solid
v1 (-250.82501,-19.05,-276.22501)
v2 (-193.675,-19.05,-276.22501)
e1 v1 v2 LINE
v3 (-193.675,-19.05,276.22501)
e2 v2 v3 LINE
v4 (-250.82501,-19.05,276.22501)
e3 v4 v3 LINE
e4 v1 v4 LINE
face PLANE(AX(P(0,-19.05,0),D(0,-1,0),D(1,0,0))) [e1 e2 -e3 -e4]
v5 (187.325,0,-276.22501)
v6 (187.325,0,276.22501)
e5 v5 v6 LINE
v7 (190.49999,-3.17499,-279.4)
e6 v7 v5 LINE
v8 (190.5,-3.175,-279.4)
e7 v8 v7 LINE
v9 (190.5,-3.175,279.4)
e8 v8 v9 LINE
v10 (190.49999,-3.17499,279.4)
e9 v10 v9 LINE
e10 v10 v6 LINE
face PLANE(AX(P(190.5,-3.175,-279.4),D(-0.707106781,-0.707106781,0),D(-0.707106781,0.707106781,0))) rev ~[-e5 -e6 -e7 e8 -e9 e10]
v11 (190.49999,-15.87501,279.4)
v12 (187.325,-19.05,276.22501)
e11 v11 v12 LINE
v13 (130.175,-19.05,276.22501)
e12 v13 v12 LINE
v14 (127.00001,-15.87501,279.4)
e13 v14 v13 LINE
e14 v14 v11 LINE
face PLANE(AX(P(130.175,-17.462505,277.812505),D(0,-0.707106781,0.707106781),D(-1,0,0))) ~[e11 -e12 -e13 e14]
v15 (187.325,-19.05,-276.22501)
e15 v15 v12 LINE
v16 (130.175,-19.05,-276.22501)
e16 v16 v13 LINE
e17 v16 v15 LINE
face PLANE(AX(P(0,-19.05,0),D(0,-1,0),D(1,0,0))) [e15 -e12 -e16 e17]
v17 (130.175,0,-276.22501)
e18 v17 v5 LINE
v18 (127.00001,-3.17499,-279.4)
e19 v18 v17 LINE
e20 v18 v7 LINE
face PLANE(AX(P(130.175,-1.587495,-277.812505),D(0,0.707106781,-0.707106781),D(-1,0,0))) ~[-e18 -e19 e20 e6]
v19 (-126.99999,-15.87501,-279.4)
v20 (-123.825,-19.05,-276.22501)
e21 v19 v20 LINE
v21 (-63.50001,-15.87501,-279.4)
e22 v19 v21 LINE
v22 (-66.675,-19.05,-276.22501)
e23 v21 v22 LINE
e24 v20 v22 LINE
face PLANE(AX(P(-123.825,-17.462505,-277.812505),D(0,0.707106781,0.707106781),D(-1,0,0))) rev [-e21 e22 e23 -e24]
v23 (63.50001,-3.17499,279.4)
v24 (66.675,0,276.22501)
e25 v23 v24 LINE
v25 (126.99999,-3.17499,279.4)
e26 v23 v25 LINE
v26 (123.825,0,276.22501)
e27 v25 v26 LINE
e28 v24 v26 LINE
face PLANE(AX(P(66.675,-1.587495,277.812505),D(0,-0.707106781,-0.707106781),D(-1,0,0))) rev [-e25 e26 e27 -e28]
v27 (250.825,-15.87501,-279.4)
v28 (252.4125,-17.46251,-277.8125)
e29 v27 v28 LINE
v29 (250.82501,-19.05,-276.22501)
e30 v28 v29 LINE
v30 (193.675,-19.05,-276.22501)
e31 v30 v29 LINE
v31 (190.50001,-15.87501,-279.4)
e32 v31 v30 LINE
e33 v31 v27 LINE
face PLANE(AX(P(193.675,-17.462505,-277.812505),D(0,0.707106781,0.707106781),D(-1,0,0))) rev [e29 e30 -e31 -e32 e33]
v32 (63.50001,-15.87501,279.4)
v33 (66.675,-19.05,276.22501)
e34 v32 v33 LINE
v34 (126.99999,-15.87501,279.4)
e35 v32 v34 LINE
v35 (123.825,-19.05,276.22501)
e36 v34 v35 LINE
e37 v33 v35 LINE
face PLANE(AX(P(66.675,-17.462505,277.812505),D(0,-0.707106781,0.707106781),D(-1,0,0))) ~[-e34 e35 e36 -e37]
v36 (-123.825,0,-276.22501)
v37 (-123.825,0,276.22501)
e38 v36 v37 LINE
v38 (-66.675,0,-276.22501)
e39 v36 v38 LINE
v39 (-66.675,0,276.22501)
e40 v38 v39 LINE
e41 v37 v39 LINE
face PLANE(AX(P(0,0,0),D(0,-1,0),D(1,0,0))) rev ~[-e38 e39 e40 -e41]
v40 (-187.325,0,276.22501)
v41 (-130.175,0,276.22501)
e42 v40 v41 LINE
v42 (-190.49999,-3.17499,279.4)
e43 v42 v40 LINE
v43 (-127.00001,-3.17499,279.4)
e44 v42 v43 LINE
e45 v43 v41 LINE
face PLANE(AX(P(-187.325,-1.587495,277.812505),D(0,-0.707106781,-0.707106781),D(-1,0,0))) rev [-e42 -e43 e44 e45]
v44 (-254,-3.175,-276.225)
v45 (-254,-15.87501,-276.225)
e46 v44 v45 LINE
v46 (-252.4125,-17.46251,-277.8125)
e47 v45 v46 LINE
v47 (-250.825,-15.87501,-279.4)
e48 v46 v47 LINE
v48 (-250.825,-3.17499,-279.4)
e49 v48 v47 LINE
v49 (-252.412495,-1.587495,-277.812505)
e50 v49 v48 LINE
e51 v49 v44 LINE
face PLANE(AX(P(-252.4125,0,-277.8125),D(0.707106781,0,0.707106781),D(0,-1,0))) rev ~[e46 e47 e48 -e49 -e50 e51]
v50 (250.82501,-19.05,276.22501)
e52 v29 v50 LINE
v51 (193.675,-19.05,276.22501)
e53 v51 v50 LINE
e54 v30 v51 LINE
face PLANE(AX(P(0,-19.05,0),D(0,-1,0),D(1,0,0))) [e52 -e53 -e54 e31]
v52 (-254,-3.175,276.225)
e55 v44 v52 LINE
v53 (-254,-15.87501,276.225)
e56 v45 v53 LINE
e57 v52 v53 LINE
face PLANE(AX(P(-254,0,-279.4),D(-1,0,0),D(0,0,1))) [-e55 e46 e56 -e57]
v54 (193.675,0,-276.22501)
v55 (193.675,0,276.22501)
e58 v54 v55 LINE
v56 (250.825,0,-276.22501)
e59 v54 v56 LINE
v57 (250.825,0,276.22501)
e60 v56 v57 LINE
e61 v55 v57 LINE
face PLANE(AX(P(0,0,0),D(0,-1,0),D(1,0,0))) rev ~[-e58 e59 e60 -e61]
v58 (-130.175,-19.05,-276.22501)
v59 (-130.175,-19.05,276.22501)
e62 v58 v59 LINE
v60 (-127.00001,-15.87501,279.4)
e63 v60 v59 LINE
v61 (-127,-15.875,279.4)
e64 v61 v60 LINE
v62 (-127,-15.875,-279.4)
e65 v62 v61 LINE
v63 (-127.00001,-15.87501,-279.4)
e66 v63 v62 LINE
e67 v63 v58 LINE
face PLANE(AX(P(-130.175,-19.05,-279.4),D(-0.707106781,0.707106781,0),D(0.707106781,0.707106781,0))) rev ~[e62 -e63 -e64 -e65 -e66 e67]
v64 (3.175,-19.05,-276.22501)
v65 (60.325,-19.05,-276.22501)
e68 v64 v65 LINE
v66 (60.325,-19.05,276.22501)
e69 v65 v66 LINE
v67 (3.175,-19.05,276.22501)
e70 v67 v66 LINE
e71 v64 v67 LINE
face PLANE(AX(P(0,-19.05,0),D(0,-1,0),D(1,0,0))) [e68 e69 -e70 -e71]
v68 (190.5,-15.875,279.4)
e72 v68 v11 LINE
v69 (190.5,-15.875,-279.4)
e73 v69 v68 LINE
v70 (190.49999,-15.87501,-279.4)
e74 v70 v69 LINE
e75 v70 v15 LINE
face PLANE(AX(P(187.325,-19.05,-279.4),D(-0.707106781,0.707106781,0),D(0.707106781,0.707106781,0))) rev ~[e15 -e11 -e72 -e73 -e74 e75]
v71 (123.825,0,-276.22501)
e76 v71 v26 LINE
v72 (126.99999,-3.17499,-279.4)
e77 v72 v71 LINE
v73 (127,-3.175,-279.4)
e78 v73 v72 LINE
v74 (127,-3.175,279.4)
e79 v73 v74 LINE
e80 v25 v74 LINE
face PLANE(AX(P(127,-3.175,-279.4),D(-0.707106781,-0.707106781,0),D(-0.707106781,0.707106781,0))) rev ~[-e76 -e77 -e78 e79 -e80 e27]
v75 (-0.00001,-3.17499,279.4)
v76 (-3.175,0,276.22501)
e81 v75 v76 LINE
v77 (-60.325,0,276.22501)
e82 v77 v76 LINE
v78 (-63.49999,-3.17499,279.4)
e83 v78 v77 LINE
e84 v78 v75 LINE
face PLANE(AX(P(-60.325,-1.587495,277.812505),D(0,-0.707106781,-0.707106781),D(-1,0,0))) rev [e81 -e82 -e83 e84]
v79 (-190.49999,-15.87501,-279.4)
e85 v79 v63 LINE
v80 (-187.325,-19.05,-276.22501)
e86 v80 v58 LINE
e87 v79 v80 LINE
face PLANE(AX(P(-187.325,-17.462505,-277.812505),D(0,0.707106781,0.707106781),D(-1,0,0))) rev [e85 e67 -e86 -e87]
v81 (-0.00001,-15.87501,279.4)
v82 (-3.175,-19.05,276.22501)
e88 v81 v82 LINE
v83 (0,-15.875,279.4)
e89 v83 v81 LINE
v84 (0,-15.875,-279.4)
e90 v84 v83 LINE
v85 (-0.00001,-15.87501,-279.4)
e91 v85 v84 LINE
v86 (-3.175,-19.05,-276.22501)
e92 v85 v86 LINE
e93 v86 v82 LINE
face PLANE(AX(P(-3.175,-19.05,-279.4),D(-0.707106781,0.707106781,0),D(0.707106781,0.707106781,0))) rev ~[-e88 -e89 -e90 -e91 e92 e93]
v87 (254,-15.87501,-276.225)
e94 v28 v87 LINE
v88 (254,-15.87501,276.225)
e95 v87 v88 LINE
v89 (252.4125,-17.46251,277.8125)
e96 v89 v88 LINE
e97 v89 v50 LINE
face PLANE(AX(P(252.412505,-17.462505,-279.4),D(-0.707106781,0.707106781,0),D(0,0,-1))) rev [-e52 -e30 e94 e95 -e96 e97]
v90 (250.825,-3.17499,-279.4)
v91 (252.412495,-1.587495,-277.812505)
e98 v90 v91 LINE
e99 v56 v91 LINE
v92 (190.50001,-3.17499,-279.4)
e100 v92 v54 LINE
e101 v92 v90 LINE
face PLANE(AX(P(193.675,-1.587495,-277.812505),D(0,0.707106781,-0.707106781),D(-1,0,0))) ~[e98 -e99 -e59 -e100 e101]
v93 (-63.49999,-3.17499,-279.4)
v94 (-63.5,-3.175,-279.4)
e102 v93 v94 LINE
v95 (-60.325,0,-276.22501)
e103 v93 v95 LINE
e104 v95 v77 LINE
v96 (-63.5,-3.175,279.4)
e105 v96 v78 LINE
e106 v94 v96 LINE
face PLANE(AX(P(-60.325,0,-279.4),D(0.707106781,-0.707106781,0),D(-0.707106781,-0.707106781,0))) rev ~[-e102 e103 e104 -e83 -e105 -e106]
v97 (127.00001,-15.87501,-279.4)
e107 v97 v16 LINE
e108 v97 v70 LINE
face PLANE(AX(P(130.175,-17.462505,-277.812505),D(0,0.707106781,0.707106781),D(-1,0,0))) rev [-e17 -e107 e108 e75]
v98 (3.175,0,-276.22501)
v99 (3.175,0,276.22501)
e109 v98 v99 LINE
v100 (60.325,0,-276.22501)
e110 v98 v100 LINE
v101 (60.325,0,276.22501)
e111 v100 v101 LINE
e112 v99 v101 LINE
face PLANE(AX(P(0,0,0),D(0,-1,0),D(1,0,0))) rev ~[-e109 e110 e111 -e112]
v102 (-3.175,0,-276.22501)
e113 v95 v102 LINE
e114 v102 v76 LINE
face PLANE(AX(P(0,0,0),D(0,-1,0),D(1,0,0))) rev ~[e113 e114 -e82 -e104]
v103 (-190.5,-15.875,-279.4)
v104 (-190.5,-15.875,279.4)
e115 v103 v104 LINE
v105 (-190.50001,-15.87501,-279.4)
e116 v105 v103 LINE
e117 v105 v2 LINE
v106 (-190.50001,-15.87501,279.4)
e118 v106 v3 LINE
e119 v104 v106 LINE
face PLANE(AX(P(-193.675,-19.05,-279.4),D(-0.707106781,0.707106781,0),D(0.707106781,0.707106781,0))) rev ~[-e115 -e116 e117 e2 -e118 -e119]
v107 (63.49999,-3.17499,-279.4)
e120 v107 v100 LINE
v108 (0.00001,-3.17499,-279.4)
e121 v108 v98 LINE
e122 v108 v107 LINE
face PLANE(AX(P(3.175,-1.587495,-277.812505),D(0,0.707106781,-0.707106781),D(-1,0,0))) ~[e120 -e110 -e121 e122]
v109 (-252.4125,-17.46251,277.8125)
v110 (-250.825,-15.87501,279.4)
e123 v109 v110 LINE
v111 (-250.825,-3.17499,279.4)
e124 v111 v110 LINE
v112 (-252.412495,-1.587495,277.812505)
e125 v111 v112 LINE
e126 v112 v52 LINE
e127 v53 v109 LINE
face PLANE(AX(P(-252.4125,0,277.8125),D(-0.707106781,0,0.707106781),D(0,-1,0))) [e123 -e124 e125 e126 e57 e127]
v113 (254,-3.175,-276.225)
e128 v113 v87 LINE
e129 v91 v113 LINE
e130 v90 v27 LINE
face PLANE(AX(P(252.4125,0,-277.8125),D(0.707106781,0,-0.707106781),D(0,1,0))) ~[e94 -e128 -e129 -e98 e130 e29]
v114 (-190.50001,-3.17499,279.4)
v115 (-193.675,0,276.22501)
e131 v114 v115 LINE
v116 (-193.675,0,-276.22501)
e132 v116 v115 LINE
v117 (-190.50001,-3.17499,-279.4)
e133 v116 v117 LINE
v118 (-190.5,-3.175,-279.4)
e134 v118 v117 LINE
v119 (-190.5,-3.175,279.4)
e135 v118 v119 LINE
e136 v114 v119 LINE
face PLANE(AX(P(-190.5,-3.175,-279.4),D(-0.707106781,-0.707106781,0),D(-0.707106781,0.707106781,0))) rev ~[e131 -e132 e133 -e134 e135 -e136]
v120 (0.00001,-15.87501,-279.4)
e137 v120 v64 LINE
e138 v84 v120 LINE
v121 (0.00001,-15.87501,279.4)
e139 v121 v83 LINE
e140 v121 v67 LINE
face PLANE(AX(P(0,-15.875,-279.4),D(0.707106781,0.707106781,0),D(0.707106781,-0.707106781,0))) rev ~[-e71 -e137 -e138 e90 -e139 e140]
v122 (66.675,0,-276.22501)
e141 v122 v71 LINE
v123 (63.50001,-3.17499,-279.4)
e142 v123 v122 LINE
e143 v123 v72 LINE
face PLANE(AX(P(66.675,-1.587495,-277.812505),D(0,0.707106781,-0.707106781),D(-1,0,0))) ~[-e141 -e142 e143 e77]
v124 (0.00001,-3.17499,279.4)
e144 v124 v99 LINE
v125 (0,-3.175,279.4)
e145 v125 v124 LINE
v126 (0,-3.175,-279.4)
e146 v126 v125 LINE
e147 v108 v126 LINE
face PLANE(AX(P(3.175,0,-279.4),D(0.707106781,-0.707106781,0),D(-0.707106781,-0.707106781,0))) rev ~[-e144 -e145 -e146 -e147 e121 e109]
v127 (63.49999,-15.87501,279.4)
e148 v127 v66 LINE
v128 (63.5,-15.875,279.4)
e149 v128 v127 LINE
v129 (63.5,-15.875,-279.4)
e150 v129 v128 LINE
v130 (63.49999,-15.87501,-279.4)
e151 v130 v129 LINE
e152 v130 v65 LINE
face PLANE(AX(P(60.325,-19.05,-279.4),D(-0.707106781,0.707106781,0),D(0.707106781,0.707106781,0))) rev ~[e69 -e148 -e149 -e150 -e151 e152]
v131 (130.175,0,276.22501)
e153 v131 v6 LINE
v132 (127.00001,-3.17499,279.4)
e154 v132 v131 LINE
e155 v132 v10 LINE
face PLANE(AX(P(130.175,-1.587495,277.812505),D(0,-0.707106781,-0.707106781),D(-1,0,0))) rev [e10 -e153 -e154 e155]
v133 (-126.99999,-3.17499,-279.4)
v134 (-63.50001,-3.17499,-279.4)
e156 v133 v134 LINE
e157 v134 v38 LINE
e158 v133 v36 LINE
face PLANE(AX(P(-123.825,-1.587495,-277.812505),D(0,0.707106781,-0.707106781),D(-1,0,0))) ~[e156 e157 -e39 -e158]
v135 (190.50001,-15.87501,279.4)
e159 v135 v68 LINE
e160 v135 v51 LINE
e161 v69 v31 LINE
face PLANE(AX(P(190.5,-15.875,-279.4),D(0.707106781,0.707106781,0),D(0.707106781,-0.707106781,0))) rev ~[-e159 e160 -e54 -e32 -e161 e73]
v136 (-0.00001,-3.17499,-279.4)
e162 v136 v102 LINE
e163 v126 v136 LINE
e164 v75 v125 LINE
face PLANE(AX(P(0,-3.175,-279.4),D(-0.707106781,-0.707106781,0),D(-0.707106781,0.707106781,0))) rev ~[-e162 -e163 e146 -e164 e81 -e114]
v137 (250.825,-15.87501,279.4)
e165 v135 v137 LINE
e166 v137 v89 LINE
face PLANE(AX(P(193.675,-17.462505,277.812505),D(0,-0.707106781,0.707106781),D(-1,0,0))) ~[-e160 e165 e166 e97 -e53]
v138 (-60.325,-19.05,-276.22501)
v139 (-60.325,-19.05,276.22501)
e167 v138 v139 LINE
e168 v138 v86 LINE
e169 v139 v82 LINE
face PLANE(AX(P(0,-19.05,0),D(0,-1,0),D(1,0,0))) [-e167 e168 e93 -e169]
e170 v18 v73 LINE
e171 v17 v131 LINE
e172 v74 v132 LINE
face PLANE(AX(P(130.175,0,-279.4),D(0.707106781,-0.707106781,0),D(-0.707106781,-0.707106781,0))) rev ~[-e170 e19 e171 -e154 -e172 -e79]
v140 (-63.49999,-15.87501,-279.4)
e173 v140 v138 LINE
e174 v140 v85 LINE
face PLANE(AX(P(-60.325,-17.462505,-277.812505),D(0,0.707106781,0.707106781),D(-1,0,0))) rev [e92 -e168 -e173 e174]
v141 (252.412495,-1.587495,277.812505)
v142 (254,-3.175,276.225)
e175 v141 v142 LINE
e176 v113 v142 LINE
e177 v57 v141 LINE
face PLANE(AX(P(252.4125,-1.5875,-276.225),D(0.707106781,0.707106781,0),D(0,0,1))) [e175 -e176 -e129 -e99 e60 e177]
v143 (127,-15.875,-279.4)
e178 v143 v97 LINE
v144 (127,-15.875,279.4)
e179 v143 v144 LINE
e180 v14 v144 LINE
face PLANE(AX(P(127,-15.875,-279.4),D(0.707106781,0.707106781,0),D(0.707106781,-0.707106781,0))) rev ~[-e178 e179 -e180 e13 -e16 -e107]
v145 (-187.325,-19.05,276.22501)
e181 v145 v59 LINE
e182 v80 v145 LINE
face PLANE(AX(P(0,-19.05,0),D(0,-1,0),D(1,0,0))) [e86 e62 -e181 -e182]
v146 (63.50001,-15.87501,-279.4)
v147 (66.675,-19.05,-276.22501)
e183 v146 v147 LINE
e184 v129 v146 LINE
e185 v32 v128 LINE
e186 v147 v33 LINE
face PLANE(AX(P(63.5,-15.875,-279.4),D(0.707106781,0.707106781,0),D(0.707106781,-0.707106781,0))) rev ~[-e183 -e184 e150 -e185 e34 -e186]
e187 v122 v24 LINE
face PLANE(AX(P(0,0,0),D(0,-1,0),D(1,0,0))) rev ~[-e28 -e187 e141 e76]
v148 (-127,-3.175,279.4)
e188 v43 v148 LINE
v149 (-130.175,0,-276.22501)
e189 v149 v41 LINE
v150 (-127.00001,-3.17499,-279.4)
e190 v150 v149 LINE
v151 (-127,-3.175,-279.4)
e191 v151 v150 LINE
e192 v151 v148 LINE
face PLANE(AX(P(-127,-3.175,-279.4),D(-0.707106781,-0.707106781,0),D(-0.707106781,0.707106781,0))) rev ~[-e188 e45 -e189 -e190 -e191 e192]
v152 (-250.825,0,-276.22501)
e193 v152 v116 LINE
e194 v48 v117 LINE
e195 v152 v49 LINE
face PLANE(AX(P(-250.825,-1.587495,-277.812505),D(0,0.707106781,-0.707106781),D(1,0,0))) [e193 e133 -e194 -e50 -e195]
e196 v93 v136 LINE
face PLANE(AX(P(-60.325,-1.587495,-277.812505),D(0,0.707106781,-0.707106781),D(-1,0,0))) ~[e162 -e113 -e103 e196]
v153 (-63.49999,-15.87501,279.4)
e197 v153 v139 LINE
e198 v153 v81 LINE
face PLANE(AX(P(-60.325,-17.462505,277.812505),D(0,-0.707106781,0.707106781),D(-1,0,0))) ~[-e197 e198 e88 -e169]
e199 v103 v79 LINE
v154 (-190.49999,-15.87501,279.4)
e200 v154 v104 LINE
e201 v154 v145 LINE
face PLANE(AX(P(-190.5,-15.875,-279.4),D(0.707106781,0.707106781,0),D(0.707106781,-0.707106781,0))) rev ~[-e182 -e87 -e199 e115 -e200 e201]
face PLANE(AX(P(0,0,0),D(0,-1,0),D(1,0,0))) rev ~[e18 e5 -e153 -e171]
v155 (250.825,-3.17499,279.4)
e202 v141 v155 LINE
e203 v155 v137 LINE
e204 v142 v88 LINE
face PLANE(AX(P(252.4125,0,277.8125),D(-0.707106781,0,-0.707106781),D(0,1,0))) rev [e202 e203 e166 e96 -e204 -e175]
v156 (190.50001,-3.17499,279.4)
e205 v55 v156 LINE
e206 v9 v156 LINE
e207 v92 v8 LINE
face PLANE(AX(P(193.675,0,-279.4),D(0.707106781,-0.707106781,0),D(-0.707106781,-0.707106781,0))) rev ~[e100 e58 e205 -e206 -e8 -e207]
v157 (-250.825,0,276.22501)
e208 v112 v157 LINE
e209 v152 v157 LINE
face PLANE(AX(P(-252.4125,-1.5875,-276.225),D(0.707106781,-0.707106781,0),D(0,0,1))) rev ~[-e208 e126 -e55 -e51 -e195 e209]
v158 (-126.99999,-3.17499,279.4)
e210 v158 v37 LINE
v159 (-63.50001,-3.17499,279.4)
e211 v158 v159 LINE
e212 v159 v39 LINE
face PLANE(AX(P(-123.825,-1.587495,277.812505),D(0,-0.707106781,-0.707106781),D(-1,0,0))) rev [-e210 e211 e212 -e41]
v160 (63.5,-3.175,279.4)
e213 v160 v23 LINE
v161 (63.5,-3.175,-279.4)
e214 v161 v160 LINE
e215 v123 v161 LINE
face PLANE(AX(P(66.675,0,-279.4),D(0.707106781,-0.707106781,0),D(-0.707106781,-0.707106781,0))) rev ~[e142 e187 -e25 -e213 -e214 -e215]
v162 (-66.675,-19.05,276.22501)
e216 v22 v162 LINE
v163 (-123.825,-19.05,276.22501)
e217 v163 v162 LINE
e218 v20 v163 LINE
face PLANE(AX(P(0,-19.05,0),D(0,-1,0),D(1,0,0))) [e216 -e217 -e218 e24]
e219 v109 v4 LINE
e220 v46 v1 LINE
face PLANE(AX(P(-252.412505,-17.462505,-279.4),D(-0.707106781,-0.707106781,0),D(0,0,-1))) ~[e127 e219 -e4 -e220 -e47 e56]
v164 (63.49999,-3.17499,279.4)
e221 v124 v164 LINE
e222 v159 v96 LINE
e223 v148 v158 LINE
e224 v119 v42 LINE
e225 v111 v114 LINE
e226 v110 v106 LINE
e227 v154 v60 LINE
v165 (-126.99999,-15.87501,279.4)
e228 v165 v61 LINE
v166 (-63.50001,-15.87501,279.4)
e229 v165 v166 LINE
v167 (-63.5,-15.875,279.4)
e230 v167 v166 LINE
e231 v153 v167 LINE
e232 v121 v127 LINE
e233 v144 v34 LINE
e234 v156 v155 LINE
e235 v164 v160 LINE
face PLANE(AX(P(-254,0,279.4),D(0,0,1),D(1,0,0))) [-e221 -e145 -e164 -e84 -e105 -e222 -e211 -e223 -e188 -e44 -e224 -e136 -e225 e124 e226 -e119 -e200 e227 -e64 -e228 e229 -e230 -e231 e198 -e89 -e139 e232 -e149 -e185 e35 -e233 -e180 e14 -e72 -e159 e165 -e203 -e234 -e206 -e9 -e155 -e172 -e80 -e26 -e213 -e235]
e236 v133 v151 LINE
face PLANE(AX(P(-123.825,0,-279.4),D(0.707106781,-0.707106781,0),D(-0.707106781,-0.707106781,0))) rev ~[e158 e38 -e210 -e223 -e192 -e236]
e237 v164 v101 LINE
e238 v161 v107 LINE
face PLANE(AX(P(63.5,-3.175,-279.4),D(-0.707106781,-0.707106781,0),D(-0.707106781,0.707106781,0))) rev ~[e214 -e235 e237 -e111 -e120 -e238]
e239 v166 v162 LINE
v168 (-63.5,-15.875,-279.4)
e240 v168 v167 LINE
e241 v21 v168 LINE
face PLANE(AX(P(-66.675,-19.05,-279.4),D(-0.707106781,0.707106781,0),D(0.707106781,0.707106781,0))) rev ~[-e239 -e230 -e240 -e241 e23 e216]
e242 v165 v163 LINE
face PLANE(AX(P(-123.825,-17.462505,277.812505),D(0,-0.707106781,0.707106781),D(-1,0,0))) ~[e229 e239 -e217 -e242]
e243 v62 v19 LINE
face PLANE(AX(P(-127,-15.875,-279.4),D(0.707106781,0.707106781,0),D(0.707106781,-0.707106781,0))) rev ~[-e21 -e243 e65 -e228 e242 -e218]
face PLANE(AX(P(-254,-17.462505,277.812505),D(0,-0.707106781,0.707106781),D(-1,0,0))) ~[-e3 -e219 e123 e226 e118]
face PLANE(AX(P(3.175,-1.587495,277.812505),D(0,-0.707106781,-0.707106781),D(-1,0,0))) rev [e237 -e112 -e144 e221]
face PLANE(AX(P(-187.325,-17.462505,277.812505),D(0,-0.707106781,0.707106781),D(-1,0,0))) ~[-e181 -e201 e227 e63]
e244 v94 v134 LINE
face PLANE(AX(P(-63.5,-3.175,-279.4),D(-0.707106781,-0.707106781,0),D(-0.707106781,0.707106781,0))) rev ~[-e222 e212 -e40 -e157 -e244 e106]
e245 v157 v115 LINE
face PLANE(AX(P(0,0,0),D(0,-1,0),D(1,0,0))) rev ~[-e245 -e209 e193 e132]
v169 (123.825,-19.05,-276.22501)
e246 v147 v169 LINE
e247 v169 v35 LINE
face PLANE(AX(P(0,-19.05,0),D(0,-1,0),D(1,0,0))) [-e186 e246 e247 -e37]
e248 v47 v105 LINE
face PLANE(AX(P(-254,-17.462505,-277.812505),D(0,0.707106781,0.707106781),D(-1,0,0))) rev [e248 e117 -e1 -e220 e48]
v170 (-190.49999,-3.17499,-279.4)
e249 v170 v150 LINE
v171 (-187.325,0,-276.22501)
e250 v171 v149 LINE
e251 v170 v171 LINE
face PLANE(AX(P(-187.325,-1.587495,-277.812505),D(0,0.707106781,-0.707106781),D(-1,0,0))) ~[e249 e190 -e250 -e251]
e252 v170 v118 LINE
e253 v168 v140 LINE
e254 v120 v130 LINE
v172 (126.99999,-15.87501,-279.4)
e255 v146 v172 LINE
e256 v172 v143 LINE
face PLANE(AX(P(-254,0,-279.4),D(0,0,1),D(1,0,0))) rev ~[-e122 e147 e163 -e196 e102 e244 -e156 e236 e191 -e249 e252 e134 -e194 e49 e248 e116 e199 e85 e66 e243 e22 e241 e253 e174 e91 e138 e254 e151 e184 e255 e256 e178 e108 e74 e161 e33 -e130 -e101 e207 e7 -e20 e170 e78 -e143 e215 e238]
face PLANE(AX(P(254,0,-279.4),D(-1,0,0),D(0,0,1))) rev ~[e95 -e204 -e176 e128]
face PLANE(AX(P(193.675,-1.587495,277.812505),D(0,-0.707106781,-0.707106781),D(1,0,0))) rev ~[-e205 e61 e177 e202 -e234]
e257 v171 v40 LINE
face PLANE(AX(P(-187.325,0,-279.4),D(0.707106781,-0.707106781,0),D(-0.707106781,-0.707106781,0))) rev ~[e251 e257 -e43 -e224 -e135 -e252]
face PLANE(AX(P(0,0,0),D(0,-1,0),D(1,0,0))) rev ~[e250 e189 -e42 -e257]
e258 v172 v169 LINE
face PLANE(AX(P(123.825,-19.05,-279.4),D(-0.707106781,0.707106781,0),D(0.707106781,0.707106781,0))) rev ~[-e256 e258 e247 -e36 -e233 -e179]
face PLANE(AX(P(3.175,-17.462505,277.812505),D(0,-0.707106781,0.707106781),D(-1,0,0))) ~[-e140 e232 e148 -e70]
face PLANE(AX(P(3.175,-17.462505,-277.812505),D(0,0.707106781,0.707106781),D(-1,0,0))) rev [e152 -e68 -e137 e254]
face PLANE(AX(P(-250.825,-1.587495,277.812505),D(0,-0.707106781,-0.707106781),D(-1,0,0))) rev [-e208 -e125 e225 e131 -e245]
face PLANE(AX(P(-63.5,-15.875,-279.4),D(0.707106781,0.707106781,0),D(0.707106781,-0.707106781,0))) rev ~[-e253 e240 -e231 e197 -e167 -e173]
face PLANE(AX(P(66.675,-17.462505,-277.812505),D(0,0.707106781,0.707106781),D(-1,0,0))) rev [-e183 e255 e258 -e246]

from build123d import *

# Parameters (mm, degrees)
F0_W      = 508
F0_H      = 558.8
F1_DEPTH  = 19.05
F3_DEPTH  = 558.801
F4_SIZE   = 3.17499
F5_SIZE   = 3.175
F7_DEPTH  = 558.801
F8_SIZE   = 3.17499
F8_SIZE_2 = 3.175


# Not quite as in the source:
# - a fillet or chamfer is up to 0.001 mm smaller than in the source, because OpenCascade refuses the exact size


with BuildPart() as f1:
    # F0 (on Front) → F1 (new body)
    with BuildSketch(Plane.XZ):
        Rectangle(F0_W, F0_H)
    extrude(amount=F1_DEPTH)

    # F2 (on face) → F3 (cut, through all)
    with BuildSketch(Plane(origin=(0, 0, -279.4), x_dir=(1, 0, 0), z_dir=(0, 0, -1))):
        Polygon((190.5, 19.05), (187.325, 19.05), (190.5, 15.875), (193.675, 19.05), align=None)
        Polygon((127, 19.05), (123.825, 19.05), (127, 15.875), (130.175, 19.05), align=None)
        Polygon((63.5, 19.05), (60.325, 19.05), (63.5, 15.875), (66.675, 19.05), align=None)
        Polygon((0, 19.05), (-3.175, 19.05), (0, 15.875), (3.175, 19.05), align=None)
        Polygon((-63.5, 19.05), (-66.675, 19.05), (-63.5, 15.875), (-60.325, 19.05), align=None)
        Polygon((-127, 19.05), (-130.175, 19.05), (-127, 15.875), (-123.825, 19.05), align=None)
        Polygon((-190.5, 19.05), (-193.675, 19.05), (-190.5, 15.875), (-187.325, 19.05), align=None)
    extrude(amount=-F3_DEPTH, mode=Mode.SUBTRACT)

    # F4 (size 3.175 in the source; OpenCascade refuses exactly that, so slightly less here)
    f4_edges = [f1.edges().sort_by_distance(p)[0] for p in [
        (-254, -19.05, 0),
        (-223.8375, -19.05, -279.4),
        (-158.75, -19.05, -279.4),
        (-95.25, -19.05, -279.4),
        (-31.75, -19.05, -279.4),
        (31.75, -19.05, -279.4),
        (95.25, -19.05, -279.4),
        (158.75, -19.05, -279.4),
        (223.8375, -19.05, -279.4),
        (254, -19.05, 0),
        (223.8375, -19.05, 279.4),
        (158.75, -19.05, 279.4),
        (95.25, -19.05, 279.4),
        (31.75, -19.05, 279.4),
        (-31.75, -19.05, 279.4),
        (-95.25, -19.05, 279.4),
        (-158.75, -19.05, 279.4),
        (-223.8375, -19.05, 279.4),
    ]]
    chamfer(f4_edges, length=F4_SIZE)

    # F5
    f5_edges = [f1.edges().sort_by_distance(p)[0] for p in [
        (-254, -7.937505, 279.4),
        (-254, -7.937505, -279.4),
        (254, -7.937505, -279.4),
        (254, -7.937505, 279.4),
    ]]
    chamfer(f5_edges, length=F5_SIZE)

    # F6 (on face) → F7 (cut, through all)
    with BuildSketch(Plane(origin=(0, 0, -279.4), x_dir=(1, 0, 0), z_dir=(0, 0, -1))):
        Polygon((-193.675, 0), (-190.5, 0), (-187.325, 0), (-190.5, 3.175), align=None)
        Polygon((-123.825, 0), (-127, 3.175), (-130.175, 0), (-127, 0), align=None)
        Polygon((-60.325, 0), (-63.5, 3.175), (-66.675, 0), (-63.5, 0), align=None)
        Polygon((3.175, 0), (0, 3.175), (-3.175, 0), (0, 0), align=None)
        Polygon((66.675, 0), (63.5, 3.175), (60.325, 0), (63.5, 0), align=None)
        Polygon((130.175, 0), (127, 3.175), (123.825, 0), (127, 0), align=None)
        Polygon((193.675, 0), (190.5, 3.175), (187.325, 0), (190.5, 0), align=None)
    extrude(amount=-F7_DEPTH, mode=Mode.SUBTRACT)

    # F8 (call 1 of 18: OpenCascade refuses the feature's edges together) (size 3.175 in the source; OpenCascade refuses exactly that, so slightly less here)
    f8_edges = [f1.edges().sort_by_distance(p)[0] for p in [
        (-222.25, 0, -279.4),
    ]]
    chamfer(f8_edges, length=F8_SIZE)

    # F8#2 (call 2 of 18)
    f8_2_edges = [f1.edges().sort_by_distance(p)[0] for p in [
        (-254, 0, 0),
    ]]
    chamfer(f8_2_edges, length=F8_SIZE_2)

    # F8#3 (call 3 of 18) (size 3.175 in the source; OpenCascade refuses exactly that, so slightly less here)
    f8_3_edges = [f1.edges().sort_by_distance(p)[0] for p in [
        (-158.75, 0, -279.4),
    ]]
    chamfer(f8_3_edges, length=F8_SIZE)

    # F8#4 (call 4 of 18) (size 3.175 in the source; OpenCascade refuses exactly that, so slightly less here)
    f8_4_edges = [f1.edges().sort_by_distance(p)[0] for p in [
        (-95.25, 0, -279.4),
    ]]
    chamfer(f8_4_edges, length=F8_SIZE)

    # F8#5 (call 5 of 18) (size 3.175 in the source; OpenCascade refuses exactly that, so slightly less here)
    f8_5_edges = [f1.edges().sort_by_distance(p)[0] for p in [
        (-31.75, 0, -279.4),
    ]]
    chamfer(f8_5_edges, length=F8_SIZE)

    # F8#6 (call 6 of 18) (size 3.175 in the source; OpenCascade refuses exactly that, so slightly less here)
    f8_6_edges = [f1.edges().sort_by_distance(p)[0] for p in [
        (31.75, 0, -279.4),
    ]]
    chamfer(f8_6_edges, length=F8_SIZE)

    # F8#7 (call 7 of 18) (size 3.175 in the source; OpenCascade refuses exactly that, so slightly less here)
    f8_7_edges = [f1.edges().sort_by_distance(p)[0] for p in [
        (95.25, 0, -279.4),
    ]]
    chamfer(f8_7_edges, length=F8_SIZE)

    # F8#8 (call 8 of 18) (size 3.175 in the source; OpenCascade refuses exactly that, so slightly less here)
    f8_8_edges = [f1.edges().sort_by_distance(p)[0] for p in [
        (158.75, 0, -279.4),
    ]]
    chamfer(f8_8_edges, length=F8_SIZE)

    # F8#9 (call 9 of 18) (size 3.175 in the source; OpenCascade refuses exactly that, so slightly less here)
    f8_9_edges = [f1.edges().sort_by_distance(p)[0] for p in [
        (222.25, 0, -279.4),
    ]]
    chamfer(f8_9_edges, length=F8_SIZE)

    # F8#10 (call 10 of 18)
    f8_10_edges = [f1.edges().sort_by_distance(p)[0] for p in [
        (254, 0, 0),
    ]]
    chamfer(f8_10_edges, length=F8_SIZE_2)

    # F8#11 (call 11 of 18) (size 3.175 in the source; OpenCascade refuses exactly that, so slightly less here)
    f8_11_edges = [f1.edges().sort_by_distance(p)[0] for p in [
        (222.25, 0, 279.4),
    ]]
    chamfer(f8_11_edges, length=F8_SIZE)

    # F8#12 (call 12 of 18) (size 3.175 in the source; OpenCascade refuses exactly that, so slightly less here)
    f8_12_edges = [f1.edges().sort_by_distance(p)[0] for p in [
        (158.75, 0, 279.4),
    ]]
    chamfer(f8_12_edges, length=F8_SIZE)

    # F8#13 (call 13 of 18) (size 3.175 in the source; OpenCascade refuses exactly that, so slightly less here)
    f8_13_edges = [f1.edges().sort_by_distance(p)[0] for p in [
        (95.25, 0, 279.4),
    ]]
    chamfer(f8_13_edges, length=F8_SIZE)

    # F8#14 (call 14 of 18) (size 3.175 in the source; OpenCascade refuses exactly that, so slightly less here)
    f8_14_edges = [f1.edges().sort_by_distance(p)[0] for p in [
        (31.75, 0, 279.4),
    ]]
    chamfer(f8_14_edges, length=F8_SIZE)

    # F8#15 (call 15 of 18) (size 3.175 in the source; OpenCascade refuses exactly that, so slightly less here)
    f8_15_edges = [f1.edges().sort_by_distance(p)[0] for p in [
        (-31.75, 0, 279.4),
    ]]
    chamfer(f8_15_edges, length=F8_SIZE)

    # F8#16 (call 16 of 18) (size 3.175 in the source; OpenCascade refuses exactly that, so slightly less here)
    f8_16_edges = [f1.edges().sort_by_distance(p)[0] for p in [
        (-95.25, 0, 279.4),
    ]]
    chamfer(f8_16_edges, length=F8_SIZE)

    # F8#17 (call 17 of 18) (size 3.175 in the source; OpenCascade refuses exactly that, so slightly less here)
    f8_17_edges = [f1.edges().sort_by_distance(p)[0] for p in [
        (-158.75, 0, 279.4),
    ]]
    chamfer(f8_17_edges, length=F8_SIZE)

    # F8#18 (call 18 of 18) (size 3.175 in the source; OpenCascade refuses exactly that, so slightly less here)
    f8_18_edges = [f1.edges().sort_by_distance(p)[0] for p in [
        (-222.25, 0, 279.4),
    ]]
    chamfer(f8_18_edges, length=F8_SIZE)


solid = f1.part
